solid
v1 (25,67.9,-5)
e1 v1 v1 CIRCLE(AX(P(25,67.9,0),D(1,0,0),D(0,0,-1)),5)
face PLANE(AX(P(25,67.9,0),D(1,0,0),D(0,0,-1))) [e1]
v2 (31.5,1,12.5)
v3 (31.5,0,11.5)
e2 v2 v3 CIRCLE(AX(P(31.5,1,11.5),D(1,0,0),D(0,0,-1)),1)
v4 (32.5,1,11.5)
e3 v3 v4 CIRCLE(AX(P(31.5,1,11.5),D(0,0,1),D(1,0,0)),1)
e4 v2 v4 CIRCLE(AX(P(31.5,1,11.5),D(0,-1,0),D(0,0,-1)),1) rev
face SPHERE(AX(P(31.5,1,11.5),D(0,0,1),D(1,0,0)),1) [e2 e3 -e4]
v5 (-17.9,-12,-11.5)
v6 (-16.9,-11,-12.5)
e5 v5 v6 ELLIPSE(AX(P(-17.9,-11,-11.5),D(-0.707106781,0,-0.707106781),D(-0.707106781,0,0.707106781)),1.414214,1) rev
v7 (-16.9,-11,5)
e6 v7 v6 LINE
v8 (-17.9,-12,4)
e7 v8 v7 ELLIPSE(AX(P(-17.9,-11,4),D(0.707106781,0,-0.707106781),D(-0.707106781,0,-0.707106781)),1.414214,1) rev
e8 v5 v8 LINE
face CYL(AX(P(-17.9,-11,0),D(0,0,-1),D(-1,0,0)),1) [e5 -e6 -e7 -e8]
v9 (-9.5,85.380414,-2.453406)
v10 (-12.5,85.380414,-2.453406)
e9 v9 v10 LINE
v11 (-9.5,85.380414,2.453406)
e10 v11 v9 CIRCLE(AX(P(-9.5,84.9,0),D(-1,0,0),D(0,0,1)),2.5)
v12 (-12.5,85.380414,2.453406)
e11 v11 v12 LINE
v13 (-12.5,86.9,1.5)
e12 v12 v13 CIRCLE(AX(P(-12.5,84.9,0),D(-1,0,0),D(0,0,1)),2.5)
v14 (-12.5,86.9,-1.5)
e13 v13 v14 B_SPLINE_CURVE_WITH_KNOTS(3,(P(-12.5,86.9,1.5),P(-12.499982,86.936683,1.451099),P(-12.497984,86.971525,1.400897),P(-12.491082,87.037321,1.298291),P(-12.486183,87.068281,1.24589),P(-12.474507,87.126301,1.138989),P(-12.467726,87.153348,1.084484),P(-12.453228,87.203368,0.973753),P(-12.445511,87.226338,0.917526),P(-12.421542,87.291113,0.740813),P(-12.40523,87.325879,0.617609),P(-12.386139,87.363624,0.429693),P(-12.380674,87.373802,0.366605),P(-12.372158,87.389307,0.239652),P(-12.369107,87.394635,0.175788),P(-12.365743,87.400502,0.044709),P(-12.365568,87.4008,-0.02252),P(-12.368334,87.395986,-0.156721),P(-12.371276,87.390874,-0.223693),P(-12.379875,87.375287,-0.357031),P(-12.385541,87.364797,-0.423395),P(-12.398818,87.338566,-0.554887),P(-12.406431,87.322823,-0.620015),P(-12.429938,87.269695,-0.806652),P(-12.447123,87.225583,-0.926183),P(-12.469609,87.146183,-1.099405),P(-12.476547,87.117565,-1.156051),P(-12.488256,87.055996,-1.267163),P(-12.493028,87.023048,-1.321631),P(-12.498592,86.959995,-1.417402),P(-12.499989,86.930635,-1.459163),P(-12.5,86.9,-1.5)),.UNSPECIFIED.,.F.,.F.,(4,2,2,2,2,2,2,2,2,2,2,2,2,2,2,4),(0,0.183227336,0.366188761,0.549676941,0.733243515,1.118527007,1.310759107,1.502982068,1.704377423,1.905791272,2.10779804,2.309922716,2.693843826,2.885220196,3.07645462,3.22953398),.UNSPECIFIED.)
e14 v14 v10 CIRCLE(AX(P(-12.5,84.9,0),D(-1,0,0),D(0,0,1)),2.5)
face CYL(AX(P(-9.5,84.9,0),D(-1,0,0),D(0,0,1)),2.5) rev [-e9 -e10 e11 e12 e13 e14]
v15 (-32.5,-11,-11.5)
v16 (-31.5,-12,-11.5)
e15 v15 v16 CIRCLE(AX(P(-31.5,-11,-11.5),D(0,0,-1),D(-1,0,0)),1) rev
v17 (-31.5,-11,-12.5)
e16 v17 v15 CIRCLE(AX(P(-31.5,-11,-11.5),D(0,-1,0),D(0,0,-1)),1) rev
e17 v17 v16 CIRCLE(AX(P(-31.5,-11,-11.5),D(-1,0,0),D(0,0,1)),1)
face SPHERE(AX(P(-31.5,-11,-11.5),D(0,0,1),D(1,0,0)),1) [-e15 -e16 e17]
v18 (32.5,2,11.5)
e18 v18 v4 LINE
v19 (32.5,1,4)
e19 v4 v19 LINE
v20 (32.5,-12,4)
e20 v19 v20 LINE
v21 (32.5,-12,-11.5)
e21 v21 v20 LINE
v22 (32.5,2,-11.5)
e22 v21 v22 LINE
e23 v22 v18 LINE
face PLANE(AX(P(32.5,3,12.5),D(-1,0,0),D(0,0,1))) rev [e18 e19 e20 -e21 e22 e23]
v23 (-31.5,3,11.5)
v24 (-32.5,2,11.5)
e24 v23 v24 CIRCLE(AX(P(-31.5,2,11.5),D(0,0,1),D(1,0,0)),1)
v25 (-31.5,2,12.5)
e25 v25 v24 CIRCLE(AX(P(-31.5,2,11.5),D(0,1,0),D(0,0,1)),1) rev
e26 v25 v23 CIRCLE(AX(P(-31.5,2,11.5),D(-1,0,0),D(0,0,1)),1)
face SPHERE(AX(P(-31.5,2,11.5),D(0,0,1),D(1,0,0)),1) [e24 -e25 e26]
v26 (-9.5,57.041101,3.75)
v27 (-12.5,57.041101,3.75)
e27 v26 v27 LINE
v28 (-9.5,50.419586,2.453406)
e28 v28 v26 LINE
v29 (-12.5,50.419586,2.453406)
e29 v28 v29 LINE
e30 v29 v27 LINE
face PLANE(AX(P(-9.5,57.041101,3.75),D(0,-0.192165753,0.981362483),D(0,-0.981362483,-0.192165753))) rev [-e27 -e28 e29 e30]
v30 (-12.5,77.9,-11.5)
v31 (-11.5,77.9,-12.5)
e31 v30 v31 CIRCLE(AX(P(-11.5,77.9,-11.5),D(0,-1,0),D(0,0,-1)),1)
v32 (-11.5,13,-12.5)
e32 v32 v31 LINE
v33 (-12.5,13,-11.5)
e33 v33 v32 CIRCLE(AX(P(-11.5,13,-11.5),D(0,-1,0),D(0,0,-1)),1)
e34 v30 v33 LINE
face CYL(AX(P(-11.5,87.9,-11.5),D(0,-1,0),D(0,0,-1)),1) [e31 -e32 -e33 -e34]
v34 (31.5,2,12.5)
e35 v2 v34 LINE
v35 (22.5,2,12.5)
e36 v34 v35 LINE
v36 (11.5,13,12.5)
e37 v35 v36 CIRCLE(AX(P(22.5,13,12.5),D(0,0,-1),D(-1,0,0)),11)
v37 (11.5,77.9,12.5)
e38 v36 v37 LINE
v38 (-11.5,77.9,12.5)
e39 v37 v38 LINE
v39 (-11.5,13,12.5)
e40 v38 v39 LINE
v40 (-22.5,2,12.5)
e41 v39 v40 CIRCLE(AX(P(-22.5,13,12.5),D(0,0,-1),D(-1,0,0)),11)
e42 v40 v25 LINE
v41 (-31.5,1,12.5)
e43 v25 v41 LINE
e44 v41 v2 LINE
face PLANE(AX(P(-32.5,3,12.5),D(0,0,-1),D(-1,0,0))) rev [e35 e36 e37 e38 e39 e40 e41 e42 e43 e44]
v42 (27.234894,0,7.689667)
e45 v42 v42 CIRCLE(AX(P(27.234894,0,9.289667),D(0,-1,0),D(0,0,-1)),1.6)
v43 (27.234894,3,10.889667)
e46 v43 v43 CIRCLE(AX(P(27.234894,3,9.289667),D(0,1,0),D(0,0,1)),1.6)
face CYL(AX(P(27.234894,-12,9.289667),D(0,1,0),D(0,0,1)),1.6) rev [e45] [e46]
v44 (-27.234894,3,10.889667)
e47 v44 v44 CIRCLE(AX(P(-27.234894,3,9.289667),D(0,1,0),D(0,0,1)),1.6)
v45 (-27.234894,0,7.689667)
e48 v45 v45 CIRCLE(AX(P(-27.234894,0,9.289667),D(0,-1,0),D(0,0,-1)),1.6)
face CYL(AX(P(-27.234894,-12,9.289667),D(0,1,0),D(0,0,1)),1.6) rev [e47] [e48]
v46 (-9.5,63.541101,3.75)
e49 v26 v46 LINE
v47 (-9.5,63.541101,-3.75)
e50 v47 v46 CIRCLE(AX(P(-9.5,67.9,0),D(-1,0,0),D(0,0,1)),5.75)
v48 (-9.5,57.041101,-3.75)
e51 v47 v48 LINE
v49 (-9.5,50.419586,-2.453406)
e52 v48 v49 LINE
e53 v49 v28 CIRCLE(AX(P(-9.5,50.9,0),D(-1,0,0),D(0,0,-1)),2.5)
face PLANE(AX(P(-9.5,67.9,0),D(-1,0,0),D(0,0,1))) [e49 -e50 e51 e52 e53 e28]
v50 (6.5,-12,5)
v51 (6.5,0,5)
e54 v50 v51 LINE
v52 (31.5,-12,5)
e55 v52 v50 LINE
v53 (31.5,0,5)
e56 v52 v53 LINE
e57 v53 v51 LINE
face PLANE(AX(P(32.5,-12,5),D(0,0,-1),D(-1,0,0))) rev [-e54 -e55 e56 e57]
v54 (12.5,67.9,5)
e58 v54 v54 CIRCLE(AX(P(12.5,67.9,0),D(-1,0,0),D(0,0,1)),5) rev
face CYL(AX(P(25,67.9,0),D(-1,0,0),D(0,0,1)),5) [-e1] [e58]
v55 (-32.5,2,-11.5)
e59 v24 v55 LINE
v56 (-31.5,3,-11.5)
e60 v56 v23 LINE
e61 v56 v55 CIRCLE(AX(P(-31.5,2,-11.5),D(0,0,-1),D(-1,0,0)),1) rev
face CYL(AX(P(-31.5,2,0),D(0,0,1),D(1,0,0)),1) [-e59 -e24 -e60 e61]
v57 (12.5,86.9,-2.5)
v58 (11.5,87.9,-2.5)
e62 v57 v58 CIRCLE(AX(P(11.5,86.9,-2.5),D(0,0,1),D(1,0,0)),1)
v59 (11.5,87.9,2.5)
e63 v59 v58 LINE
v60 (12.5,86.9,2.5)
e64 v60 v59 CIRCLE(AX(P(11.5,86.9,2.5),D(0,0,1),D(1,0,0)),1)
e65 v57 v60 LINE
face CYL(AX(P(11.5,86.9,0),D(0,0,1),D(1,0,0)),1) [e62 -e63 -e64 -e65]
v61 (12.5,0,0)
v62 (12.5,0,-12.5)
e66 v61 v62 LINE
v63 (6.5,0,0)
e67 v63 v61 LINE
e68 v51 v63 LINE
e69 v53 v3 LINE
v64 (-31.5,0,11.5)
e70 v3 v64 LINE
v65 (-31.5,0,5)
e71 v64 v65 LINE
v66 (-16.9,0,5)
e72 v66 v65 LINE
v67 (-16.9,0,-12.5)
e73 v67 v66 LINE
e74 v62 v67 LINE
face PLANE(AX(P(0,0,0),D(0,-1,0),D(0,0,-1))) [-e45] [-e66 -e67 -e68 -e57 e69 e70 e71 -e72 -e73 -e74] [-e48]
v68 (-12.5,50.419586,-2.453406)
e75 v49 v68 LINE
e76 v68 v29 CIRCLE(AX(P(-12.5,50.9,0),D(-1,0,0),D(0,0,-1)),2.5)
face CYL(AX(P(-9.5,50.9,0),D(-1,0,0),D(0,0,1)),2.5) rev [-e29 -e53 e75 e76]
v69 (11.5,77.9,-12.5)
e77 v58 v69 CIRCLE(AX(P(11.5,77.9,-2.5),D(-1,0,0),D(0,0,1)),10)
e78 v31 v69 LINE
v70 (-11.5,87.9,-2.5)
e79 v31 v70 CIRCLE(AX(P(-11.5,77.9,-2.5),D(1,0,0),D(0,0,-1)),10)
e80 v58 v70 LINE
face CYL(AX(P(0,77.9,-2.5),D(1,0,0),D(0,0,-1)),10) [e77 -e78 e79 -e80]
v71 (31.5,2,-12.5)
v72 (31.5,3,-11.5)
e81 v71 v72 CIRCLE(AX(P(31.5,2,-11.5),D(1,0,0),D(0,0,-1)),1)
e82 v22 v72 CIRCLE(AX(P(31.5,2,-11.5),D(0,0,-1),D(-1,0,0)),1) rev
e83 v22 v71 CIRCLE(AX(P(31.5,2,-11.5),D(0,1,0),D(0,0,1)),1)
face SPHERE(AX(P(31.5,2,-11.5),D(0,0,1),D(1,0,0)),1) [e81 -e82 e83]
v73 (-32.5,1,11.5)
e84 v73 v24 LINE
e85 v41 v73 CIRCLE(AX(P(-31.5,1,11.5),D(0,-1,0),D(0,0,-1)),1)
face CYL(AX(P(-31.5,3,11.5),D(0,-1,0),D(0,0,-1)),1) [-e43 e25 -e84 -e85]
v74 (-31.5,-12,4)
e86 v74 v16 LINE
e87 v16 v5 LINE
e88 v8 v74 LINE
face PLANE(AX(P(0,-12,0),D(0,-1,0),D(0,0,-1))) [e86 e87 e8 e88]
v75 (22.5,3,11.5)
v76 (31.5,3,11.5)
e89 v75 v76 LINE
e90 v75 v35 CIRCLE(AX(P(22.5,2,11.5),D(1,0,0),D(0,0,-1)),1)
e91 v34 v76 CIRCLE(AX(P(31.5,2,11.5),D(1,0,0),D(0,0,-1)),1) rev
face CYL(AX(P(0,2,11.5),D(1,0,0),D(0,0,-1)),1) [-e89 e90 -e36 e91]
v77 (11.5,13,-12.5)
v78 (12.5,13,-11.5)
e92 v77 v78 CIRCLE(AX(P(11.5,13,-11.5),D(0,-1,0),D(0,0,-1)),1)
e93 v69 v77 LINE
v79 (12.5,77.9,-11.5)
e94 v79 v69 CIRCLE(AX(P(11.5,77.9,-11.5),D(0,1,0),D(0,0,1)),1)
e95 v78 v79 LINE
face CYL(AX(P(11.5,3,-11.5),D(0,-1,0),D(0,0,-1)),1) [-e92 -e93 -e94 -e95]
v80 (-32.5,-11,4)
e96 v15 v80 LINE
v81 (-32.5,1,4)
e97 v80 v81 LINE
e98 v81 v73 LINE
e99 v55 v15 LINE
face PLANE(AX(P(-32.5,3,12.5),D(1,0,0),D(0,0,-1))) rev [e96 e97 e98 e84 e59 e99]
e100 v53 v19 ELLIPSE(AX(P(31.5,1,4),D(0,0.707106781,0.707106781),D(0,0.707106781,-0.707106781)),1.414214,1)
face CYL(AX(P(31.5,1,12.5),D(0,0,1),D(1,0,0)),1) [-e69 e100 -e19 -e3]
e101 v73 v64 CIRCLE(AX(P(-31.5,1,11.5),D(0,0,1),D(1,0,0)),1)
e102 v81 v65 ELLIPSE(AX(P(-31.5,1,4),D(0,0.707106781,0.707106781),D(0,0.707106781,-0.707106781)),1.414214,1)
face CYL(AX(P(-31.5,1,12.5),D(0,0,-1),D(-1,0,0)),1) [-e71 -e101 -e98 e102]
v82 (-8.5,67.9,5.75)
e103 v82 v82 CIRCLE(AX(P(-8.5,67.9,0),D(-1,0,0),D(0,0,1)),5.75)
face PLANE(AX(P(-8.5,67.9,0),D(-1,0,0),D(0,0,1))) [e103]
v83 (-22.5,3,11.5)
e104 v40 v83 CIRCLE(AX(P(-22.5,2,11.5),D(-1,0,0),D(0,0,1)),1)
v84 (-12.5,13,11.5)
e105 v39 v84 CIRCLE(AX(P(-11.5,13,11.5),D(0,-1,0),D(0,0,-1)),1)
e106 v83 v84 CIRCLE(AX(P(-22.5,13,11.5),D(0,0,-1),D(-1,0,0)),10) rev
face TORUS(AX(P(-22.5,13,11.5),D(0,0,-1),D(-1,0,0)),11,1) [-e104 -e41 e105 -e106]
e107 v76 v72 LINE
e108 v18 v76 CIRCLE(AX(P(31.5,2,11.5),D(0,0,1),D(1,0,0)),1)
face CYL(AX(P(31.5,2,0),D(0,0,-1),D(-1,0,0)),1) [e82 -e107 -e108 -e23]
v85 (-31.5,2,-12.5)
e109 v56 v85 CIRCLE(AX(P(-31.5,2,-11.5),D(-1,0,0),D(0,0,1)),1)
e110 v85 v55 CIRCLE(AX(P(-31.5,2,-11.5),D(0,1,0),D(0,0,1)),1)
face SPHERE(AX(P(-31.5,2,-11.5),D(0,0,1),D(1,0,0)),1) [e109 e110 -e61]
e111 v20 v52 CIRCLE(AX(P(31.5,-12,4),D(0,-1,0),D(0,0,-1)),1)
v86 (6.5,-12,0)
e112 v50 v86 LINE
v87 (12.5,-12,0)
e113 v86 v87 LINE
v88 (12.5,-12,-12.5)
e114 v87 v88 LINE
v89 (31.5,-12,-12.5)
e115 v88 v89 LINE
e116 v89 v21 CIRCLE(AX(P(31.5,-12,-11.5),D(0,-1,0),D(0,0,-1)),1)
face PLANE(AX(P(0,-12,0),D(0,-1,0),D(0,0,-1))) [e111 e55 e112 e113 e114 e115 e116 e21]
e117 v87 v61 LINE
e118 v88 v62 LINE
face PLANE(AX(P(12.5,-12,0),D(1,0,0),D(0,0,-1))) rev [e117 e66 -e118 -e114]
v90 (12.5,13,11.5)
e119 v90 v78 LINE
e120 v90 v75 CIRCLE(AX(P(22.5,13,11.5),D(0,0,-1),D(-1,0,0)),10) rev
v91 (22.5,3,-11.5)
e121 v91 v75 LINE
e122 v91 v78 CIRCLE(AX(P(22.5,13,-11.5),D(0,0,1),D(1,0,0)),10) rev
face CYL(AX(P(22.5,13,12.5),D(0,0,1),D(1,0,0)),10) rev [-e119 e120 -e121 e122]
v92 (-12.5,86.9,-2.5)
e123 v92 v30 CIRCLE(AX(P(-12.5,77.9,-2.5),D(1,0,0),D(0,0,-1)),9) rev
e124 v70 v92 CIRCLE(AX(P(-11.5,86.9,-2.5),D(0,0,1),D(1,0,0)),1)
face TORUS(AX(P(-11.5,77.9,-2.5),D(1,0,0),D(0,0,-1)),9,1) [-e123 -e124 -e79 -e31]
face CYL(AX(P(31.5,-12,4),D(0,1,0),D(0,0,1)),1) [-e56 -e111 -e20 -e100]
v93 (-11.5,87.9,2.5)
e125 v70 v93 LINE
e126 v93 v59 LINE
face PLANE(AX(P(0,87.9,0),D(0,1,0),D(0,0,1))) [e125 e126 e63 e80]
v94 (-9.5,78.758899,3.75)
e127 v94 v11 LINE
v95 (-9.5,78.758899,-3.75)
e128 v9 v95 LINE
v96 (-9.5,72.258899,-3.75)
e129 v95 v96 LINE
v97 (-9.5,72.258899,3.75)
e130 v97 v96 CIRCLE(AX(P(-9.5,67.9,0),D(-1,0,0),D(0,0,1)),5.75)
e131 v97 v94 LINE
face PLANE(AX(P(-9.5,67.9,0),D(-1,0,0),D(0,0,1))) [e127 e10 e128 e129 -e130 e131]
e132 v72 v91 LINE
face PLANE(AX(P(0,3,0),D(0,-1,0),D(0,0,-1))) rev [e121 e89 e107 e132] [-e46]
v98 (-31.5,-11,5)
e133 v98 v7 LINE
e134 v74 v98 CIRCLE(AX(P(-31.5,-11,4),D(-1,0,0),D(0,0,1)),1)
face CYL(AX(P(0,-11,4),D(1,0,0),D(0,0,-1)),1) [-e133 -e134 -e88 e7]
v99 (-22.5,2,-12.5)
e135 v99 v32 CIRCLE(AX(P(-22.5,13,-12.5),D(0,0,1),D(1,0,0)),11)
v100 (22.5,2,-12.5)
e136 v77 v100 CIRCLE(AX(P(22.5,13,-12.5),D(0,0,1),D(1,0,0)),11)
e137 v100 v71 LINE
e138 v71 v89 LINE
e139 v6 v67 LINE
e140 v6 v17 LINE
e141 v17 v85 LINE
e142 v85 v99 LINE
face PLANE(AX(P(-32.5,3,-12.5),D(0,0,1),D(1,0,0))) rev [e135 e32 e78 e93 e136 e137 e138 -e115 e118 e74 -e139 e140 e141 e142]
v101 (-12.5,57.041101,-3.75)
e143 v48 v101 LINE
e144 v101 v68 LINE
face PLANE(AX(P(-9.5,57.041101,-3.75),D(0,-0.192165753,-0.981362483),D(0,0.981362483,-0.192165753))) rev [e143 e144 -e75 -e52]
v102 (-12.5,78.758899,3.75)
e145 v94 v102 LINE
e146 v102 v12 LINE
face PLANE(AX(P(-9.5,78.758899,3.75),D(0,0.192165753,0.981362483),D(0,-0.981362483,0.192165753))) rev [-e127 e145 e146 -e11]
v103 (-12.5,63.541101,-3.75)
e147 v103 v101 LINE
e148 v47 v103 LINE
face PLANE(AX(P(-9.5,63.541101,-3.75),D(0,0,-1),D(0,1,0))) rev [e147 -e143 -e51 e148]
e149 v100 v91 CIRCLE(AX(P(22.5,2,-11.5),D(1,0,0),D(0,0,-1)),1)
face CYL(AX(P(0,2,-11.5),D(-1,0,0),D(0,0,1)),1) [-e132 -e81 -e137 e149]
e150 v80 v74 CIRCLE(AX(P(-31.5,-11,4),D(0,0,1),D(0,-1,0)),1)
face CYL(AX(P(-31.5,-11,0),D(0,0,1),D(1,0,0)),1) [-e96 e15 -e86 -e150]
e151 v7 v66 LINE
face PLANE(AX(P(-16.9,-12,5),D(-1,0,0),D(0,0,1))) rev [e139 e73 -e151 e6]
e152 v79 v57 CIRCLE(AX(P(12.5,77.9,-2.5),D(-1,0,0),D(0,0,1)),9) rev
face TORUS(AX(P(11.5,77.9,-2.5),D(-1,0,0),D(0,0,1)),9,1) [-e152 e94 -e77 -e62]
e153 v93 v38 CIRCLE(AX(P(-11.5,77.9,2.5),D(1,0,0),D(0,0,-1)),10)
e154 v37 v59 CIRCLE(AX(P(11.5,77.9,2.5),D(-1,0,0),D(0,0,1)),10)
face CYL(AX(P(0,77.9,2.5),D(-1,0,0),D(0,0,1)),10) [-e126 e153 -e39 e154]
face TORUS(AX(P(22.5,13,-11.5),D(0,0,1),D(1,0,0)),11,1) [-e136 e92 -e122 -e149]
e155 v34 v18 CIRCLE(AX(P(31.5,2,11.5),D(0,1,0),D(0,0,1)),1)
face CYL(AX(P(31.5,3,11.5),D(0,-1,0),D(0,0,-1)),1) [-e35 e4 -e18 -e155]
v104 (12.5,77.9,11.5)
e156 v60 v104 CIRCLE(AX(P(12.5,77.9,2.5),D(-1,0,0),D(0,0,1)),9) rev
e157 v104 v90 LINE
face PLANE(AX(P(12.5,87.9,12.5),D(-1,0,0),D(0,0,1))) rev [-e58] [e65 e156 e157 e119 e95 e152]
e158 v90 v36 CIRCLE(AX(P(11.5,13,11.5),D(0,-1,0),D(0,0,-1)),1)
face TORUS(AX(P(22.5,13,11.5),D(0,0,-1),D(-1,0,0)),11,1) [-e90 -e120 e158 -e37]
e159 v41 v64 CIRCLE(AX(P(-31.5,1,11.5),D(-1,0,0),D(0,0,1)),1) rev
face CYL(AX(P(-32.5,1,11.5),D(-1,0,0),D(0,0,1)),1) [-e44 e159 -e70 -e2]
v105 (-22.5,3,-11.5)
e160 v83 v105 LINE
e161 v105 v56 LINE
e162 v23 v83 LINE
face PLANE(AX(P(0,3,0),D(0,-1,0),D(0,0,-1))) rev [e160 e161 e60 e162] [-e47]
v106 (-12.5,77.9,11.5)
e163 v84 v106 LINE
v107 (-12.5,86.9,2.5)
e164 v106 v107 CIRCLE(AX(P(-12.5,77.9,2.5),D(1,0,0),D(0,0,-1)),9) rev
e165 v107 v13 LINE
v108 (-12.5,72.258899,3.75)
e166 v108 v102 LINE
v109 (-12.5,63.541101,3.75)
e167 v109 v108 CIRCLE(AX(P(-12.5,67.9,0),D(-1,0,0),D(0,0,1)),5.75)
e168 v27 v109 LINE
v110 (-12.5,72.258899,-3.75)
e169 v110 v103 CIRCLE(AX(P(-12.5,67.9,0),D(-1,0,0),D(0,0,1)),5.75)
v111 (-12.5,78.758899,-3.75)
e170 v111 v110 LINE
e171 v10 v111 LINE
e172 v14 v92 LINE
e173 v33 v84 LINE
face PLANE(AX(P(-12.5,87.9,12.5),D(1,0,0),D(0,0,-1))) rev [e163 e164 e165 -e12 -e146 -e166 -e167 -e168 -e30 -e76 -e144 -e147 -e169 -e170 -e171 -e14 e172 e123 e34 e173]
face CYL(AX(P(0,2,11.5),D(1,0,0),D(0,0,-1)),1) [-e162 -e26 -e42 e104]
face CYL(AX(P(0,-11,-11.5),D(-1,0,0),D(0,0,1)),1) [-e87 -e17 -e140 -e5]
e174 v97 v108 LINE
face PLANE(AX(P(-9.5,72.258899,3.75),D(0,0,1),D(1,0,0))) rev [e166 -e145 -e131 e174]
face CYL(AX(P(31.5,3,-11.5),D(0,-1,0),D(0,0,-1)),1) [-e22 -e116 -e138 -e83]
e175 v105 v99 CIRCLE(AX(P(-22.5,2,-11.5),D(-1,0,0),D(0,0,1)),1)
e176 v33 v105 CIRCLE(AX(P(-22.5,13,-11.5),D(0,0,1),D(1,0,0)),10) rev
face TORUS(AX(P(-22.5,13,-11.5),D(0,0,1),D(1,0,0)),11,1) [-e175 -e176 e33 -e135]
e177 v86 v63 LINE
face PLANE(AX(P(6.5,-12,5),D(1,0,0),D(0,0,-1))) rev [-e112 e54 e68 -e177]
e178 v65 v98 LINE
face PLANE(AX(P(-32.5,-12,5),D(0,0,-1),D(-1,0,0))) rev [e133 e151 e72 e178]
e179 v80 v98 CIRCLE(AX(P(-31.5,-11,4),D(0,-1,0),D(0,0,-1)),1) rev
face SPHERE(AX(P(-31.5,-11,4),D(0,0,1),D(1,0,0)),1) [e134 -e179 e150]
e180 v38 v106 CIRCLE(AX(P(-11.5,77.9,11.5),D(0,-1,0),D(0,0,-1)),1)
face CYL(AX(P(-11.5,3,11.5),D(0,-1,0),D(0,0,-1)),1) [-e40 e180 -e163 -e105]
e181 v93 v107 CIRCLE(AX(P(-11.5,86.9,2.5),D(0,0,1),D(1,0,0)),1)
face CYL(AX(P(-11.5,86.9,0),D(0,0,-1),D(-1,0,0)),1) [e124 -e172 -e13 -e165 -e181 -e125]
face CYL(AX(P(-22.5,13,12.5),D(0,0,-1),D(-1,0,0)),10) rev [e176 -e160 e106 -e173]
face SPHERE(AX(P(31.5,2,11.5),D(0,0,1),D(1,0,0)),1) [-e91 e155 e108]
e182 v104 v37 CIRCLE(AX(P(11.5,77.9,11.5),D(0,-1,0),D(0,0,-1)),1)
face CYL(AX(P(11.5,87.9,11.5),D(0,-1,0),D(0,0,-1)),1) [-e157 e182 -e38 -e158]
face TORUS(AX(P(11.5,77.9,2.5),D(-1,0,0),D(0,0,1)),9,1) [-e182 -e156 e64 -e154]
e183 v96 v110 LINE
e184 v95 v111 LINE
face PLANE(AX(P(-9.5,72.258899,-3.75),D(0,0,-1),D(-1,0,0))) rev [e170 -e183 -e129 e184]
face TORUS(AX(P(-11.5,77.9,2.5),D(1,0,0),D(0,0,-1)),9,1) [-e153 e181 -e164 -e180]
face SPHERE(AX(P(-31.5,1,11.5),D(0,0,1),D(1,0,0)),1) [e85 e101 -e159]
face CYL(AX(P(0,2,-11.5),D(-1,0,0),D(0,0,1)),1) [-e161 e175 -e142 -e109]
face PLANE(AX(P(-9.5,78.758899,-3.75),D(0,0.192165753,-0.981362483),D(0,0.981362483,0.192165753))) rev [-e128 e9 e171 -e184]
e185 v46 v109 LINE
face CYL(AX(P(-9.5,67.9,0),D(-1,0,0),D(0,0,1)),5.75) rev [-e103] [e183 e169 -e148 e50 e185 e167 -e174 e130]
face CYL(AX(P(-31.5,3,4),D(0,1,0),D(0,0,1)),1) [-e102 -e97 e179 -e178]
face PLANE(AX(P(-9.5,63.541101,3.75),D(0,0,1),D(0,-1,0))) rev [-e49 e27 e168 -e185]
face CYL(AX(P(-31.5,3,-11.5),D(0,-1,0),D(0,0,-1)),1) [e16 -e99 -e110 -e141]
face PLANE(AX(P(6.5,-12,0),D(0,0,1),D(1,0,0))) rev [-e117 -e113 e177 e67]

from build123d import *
from build123d.topology import SkipClean

# Parameters (mm, degrees)
SKETCH2_W           = 65
SKETCH2_H           = 25
BOSS_EXTRUDE1_DEPTH = 3
SKETCH3_W           = 15.6
SKETCH3_H           = 17.5
BOSS_EXTRUDE2_DEPTH = 12
SKETCH5_R           = 1.6
CUT_EXTRUDE1_DEPTH  = 38.91437722
SKETCH6_W           = 25
SKETCH6_H           = 25
BOSS_EXTRUDE3_DEPTH = 84.9
SKETCH9_R           = 5
BOSS_EXTRUDE4_DEPTH = 12.5
CUT_EXTRUDE2_DEPTH  = 3
SKETCH11_R          = 5.75
CUT_EXTRUDE3_DEPTH  = 1
FILLET1_R           = 10
FILLET2_R           = 1


with BuildPart() as part:
    # Sketch2 → Boss-Extrude1 (new body)
    with BuildSketch(Plane(origin=(0, 0, 0), x_dir=(1, 0, 0), z_dir=(0, 1, 0))):
        Rectangle(SKETCH2_W, SKETCH2_H)
    extrude(amount=BOSS_EXTRUDE1_DEPTH)

    # Sketch3 → Boss-Extrude2 (add)
    with BuildSketch(Plane.XZ):
        with Locations((-24.7, -3.75)):
            Rectangle(SKETCH3_W, SKETCH3_H)
        Polygon((32.5, 5), (6.5, 5), (6.5, 0), (12.5, 0), (12.5, -12.5), (32.5, -12.5), align=None)
    extrude(amount=BOSS_EXTRUDE2_DEPTH)

    # Sketch5 → Cut-Extrude1 (cut, through all)
    with BuildSketch(Plane(origin=(0, 3, 0), x_dir=(1, 0, 0), z_dir=(0, 1, 0))):
        with Locations(Location((27.234893969, -9.289666573, 0), (0, 0, 270))):
            Circle(SKETCH5_R)
        with Locations(Location((-27.234893969, -9.289666573, 0), (0, 0, 270))):
            Circle(SKETCH5_R)
    extrude(amount=-CUT_EXTRUDE1_DEPTH, mode=Mode.SUBTRACT)

    # Sketch6 → Boss-Extrude3 (add)
    with BuildSketch(Plane(origin=(0, 3, 0), x_dir=(1, 0, 0), z_dir=(0, 1, 0))):
        Rectangle(SKETCH6_W, SKETCH6_H)
    extrude(amount=BOSS_EXTRUDE3_DEPTH)

    # Sketch9 → Boss-Extrude4 (add)
    with BuildSketch(Plane(origin=(12.5, 0, 0), x_dir=(0, 0, -1), z_dir=(1, 0, 0))):
        with Locations(Location((0, 67.9, 0), (0, 0, 180))):
            Circle(SKETCH9_R)
    extrude(amount=BOSS_EXTRUDE4_DEPTH)

    # Sketch10 → Cut-Extrude2 (cut)
    with BuildSketch(Plane.ZY.offset(12.5)):
        with BuildLine():
            Line((-3.75, 72.258898944), (-3.75, 78.758898944))
            Line((-3.75, 78.758898944), (-2.453406208, 85.380414384))
            ThreePointArc((-2.453406208, 85.380414384), (0, 87.4), (2.453406208, 85.380414384))
            Line((2.453406208, 85.380414384), (3.75, 78.758898944))
            Line((3.75, 78.758898944), (3.75, 72.258898944))
            ThreePointArc((3.75, 72.258898944), (5.75, 67.9), (3.75, 63.541101056))
            Line((3.75, 63.541101056), (3.75, 57.041101056))
            Line((3.75, 57.041101056), (2.453406208, 50.419585616))
            ThreePointArc((2.453406208, 50.419585616), (0, 48.4), (-2.453406208, 50.419585616))
            Line((-2.453406208, 50.419585616), (-3.75, 57.041101056))
            Line((-3.75, 57.041101056), (-3.75, 63.541101056))
            ThreePointArc((-3.75, 63.541101056), (-5.75, 67.9), (-3.75, 72.258898944))
        make_face()
    extrude(amount=-CUT_EXTRUDE2_DEPTH, mode=Mode.SUBTRACT)

    # Sketch11 → Cut-Extrude3 (cut)
    with SkipClean():  # the faces are left unmerged after this step: merging them gives an invalid solid
        with BuildSketch(Plane.ZY.offset(9.5)):
            with Locations((0, 67.9)):
                Circle(SKETCH11_R)
        extrude(amount=-CUT_EXTRUDE3_DEPTH, mode=Mode.SUBTRACT)

    # Fillet1
    fillet1_edges = [part.edges().sort_by_distance(p)[0] for p in [
        (12.5, 3, 0),
        (-12.5, 3, 0),
        (0, 87.9, -12.5),
        (0, 87.9, 12.5),
    ]]
    fillet(fillet1_edges, radius=FILLET1_R)

    # Fillet2
    # the kernel refuses this fillet: 1 mm, written as the material it takes off along each edge
    with BuildSketch(Plane(origin=(31.5, 2, 11.5), x_dir=(0, 1, 0), z_dir=(0, 0, 1))) as fillet2_piece_1_section:
        Polygon((0, 0), (FILLET2_R, 0), (FILLET2_R, -FILLET2_R), (0, -FILLET2_R), align=None)
    fillet2_piece_1 = extrude(amount=FILLET2_R, mode=Mode.PRIVATE)
    fillet2_piece_1 = fillet2_piece_1 - Plane(origin=(31.5, 2, 11.5), x_dir=(-0.7071067811865475, -0.7071067811865475, 0), z_dir=(0, 0, 1)) * Sphere(FILLET2_R, mode=Mode.PRIVATE)
    add(fillet2_piece_1, mode=Mode.SUBTRACT)
    with BuildSketch(Plane(origin=(-31.5, 2, 11.5), x_dir=(0, 1, 0), z_dir=(0, 0, 1))) as fillet2_piece_2_section:
        Polygon((0, 0), (FILLET2_R, 0), (FILLET2_R, FILLET2_R), (0, FILLET2_R), align=None)
    fillet2_piece_2 = extrude(amount=FILLET2_R, mode=Mode.PRIVATE)
    fillet2_piece_2 = fillet2_piece_2 - Plane(origin=(-31.5, 2, 11.5), x_dir=(0.7071067811865475, -0.7071067811865475, 0), z_dir=(0, 0, 1)) * Sphere(FILLET2_R, mode=Mode.PRIVATE)
    add(fillet2_piece_2, mode=Mode.SUBTRACT)
    with BuildSketch(Plane(origin=(-31.5, 2, -11.5), x_dir=(0, 1, 0), z_dir=(-1, 0, 0))) as fillet2_piece_3_section:
        Polygon((0, 0), (FILLET2_R, 0), (FILLET2_R, FILLET2_R), (0, FILLET2_R), align=None)
    fillet2_piece_3 = extrude(amount=FILLET2_R, mode=Mode.PRIVATE)
    fillet2_piece_3 = fillet2_piece_3 - Plane(origin=(-31.5, 2, -11.5), x_dir=(0, -0.7071067811865475, 0.7071067811865475), z_dir=(-1, 0, 0)) * Sphere(FILLET2_R, mode=Mode.PRIVATE)
    add(fillet2_piece_3, mode=Mode.SUBTRACT)
    with BuildSketch(Plane(origin=(-31.5, -11, 4), x_dir=(0, 0, 1), z_dir=(-1, 0, 0))) as fillet2_piece_4_section:
        Polygon((0, 0), (FILLET2_R, 0), (FILLET2_R, -FILLET2_R), (0, -FILLET2_R), align=None)
    fillet2_piece_4 = extrude(amount=FILLET2_R, mode=Mode.PRIVATE)
    fillet2_piece_4 = fillet2_piece_4 - Plane(origin=(-31.5, -11, 4), x_dir=(0, 0.7071067811865475, -0.7071067811865475), z_dir=(-1, 0, 0)) * Sphere(FILLET2_R, mode=Mode.PRIVATE)
    add(fillet2_piece_4, mode=Mode.SUBTRACT)
    with BuildSketch(Plane(origin=(-31.5, -11, -11.5), x_dir=(0, 0, -1), z_dir=(-1, 0, 0))) as fillet2_piece_5_section:
        Polygon((0, 0), (FILLET2_R, 0), (FILLET2_R, FILLET2_R), (0, FILLET2_R), align=None)
    fillet2_piece_5 = extrude(amount=FILLET2_R, mode=Mode.PRIVATE)
    fillet2_piece_5 = fillet2_piece_5 - Plane(origin=(-31.5, -11, -11.5), x_dir=(0, 0.7071067811865475, 0.7071067811865475), z_dir=(-1, 0, 0)) * Sphere(FILLET2_R, mode=Mode.PRIVATE)
    add(fillet2_piece_5, mode=Mode.SUBTRACT)
    with BuildSketch(Plane(origin=(-31.5, 1, 11.5), x_dir=(-1, 0, 0), z_dir=(0, 0, 1))) as fillet2_piece_6_section:
        Polygon((0, 0), (FILLET2_R, 0), (FILLET2_R, FILLET2_R), (0, FILLET2_R), align=None)
    fillet2_piece_6 = extrude(amount=FILLET2_R, mode=Mode.PRIVATE)
    fillet2_piece_6 = fillet2_piece_6 - Plane(origin=(-31.5, 1, 11.5), x_dir=(0.7071067811865475, 0.7071067811865475, 0), z_dir=(0, 0, 1)) * Sphere(FILLET2_R, mode=Mode.PRIVATE)
    add(fillet2_piece_6, mode=Mode.SUBTRACT)
    with BuildSketch(Plane(origin=(31.5, 1, 11.5), x_dir=(0, -1, 0), z_dir=(0, 0, 1))) as fillet2_piece_7_section:
        Polygon((0, 0), (FILLET2_R, 0), (FILLET2_R, FILLET2_R), (0, FILLET2_R), align=None)
    fillet2_piece_7 = extrude(amount=FILLET2_R, mode=Mode.PRIVATE)
    fillet2_piece_7 = fillet2_piece_7 - Plane(origin=(31.5, 1, 11.5), x_dir=(-0.7071067811865475, 0.7071067811865475, 0), z_dir=(0, 0, 1)) * Sphere(FILLET2_R, mode=Mode.PRIVATE)
    add(fillet2_piece_7, mode=Mode.SUBTRACT)
    with BuildSketch(Plane(origin=(31.5, 2, -11.5), x_dir=(0, 0, -1), z_dir=(0, 1, 0))) as fillet2_piece_8_section:
        Polygon((0, 0), (FILLET2_R, 0), (FILLET2_R, -FILLET2_R), (0, -FILLET2_R), align=None)
    fillet2_piece_8 = extrude(amount=FILLET2_R, mode=Mode.PRIVATE)
    fillet2_piece_8 = fillet2_piece_8 - Plane(origin=(31.5, 2, -11.5), x_dir=(-0.7071067811865475, 0, 0.7071067811865475), z_dir=(0, 1, 0)) * Sphere(FILLET2_R, mode=Mode.PRIVATE)
    add(fillet2_piece_8, mode=Mode.SUBTRACT)
    with BuildSketch(Plane(origin=(22.5, 3, 12.5), x_dir=(0, -1, 0), z_dir=(1, 0, 0)), Plane(origin=(-31.5, 3, 12.5), x_dir=(0, -1, 0), z_dir=(1, 0, 0))) as fillet2_piece_9:
        with BuildLine():
            CenterArc((FILLET2_R, FILLET2_R), FILLET2_R, 180, 90)
            Line((0, FILLET2_R), (0, 0))
            Line((0, 0), (FILLET2_R, 0))
        make_face()
    extrude(amount=9, mode=Mode.SUBTRACT)
    with BuildSketch(Plane(origin=(22.5, 13, 12.5), x_dir=(-1, 0, 0), z_dir=(0, 1, 0))) as fillet2_piece_10:
        with BuildLine():
            CenterArc((10 + FILLET2_R, -FILLET2_R), FILLET2_R, 90, 90)
            Line((10, -FILLET2_R), (10, 0))
            Line((10, 0), (10 + FILLET2_R, 0))
        make_face()
    revolve(axis=Axis((22.5, 13, 12.5), (0, 0, 1)), revolution_arc=90, mode=Mode.SUBTRACT)
    with BuildSketch(Plane(origin=(12.5, 13, 12.5), x_dir=(-1, 0, 0), z_dir=(0, 1, 0)), Plane(origin=(12.5, 13, -12.5), x_dir=(0, 0, 1), z_dir=(0, 1, 0))) as fillet2_piece_11:
        with BuildLine():
            CenterArc((FILLET2_R, -FILLET2_R), FILLET2_R, 90, 90)
            Line((0, -FILLET2_R), (0, 0))
            Line((0, 0), (FILLET2_R, 0))
        make_face()
    extrude(amount=64.9, mode=Mode.SUBTRACT)
    with BuildSketch(Plane(origin=(12.5, 77.9, 2.5), x_dir=(0, 0, 1), z_dir=(0, -1, 0))) as fillet2_piece_12:
        with BuildLine():
            CenterArc((10 - FILLET2_R, FILLET2_R), FILLET2_R, 270, 90)
            Line((10 - FILLET2_R, 0), (10, 0))
            Line((10, 0), (10, FILLET2_R))
        make_face()
    revolve(axis=Axis((12.5, 77.9, 2.5), (-1, 0, 0)), revolution_arc=90, mode=Mode.SUBTRACT)
    with BuildSketch(Plane(origin=(12.5, 87.9, -2.5), x_dir=(0, -1, 0), z_dir=(0, 0, 1)), Plane(origin=(-12.5, 87.9, 2.5), x_dir=(0, -1, 0), z_dir=(0, 0, -1))) as fillet2_piece_13:
        with BuildLine():
            CenterArc((FILLET2_R, -FILLET2_R), FILLET2_R, 90, 90)
            Line((0, -FILLET2_R), (0, 0))
            Line((0, 0), (FILLET2_R, 0))
        make_face()
    extrude(amount=5, mode=Mode.SUBTRACT)
    with BuildSketch(Plane(origin=(12.5, 77.9, -2.5), x_dir=(0, 1, 0), z_dir=(0, 0, 1))) as fillet2_piece_14:
        with BuildLine():
            CenterArc((10 - FILLET2_R, FILLET2_R), FILLET2_R, 270, 90)
            Line((10, FILLET2_R), (10, 0))
            Line((10, 0), (10 - FILLET2_R, 0))
        make_face()
    revolve(axis=Axis((12.5, 77.9, -2.5), (-1, 0, 0)), revolution_arc=90, mode=Mode.SUBTRACT)
    with BuildSketch(Plane(origin=(22.5, 13, -12.5), x_dir=(-1, 0, 0), z_dir=(0, 1, 0))) as fillet2_piece_15:
        with BuildLine():
            CenterArc((10 + FILLET2_R, FILLET2_R), FILLET2_R, 180, 90)
            Line((10 + FILLET2_R, 0), (10, 0))
            Line((10, 0), (10, FILLET2_R))
        make_face()
    revolve(axis=Axis((22.5, 13, -12.5), (0, 0, 1)), revolution_arc=90, mode=Mode.SUBTRACT)
    with BuildSketch(Plane(origin=(-22.5, 13, 12.5), x_dir=(0, -1, 0), z_dir=(-1, 0, 0))) as fillet2_piece_16:
        with BuildLine():
            CenterArc((10 + FILLET2_R, -FILLET2_R), FILLET2_R, 90, 90)
            Line((10, -FILLET2_R), (10, 0))
            Line((10, 0), (10 + FILLET2_R, 0))
        make_face()
    revolve(axis=Axis((-22.5, 13, 12.5), (0, 0, 1)), revolution_arc=90, mode=Mode.SUBTRACT)
    with BuildSketch(Plane(origin=(-12.5, 13, 12.5), x_dir=(1, 0, 0), z_dir=(0, 1, 0)), Plane(origin=(-12.5, 13, -12.5), x_dir=(0, 0, 1), z_dir=(0, 1, 0))) as fillet2_piece_17:
        with BuildLine():
            CenterArc((FILLET2_R, FILLET2_R), FILLET2_R, 180, 90)
            Line((0, FILLET2_R), (0, 0))
            Line((0, 0), (FILLET2_R, 0))
        make_face()
    extrude(amount=64.9, mode=Mode.SUBTRACT)
    with BuildSketch(Plane(origin=(-12.5, 77.9, 2.5), x_dir=(0, 0, 1), z_dir=(0, -1, 0))) as fillet2_piece_18:
        with BuildLine():
            CenterArc((10 - FILLET2_R, -FILLET2_R), FILLET2_R, 0, 90)
            Line((10, -FILLET2_R), (10, 0))
            Line((10, 0), (10 - FILLET2_R, 0))
        make_face()
    revolve(axis=Axis((-12.5, 77.9, 2.5), (-1, 0, 0)), revolution_arc=90, mode=Mode.SUBTRACT)
    with BuildSketch(Plane(origin=(-12.5, 77.9, -2.5), x_dir=(0, 1, 0), z_dir=(0, 0, 1))) as fillet2_piece_19:
        with BuildLine():
            CenterArc((10 - FILLET2_R, -FILLET2_R), FILLET2_R, 0, 90)
            Line((10, -FILLET2_R), (10, 0))
            Line((10, 0), (10 - FILLET2_R, 0))
        make_face()
    revolve(axis=Axis((-12.5, 77.9, -2.5), (-1, 0, 0)), revolution_arc=90, mode=Mode.SUBTRACT)
    with BuildSketch(Plane(origin=(-22.5, 3, -12.5), x_dir=(0, 0, 1), z_dir=(-1, 0, 0)), Plane(origin=(31.5, 3, -12.5), x_dir=(0, 0, 1), z_dir=(-1, 0, 0))) as fillet2_piece_20:
        with BuildLine():
            CenterArc((FILLET2_R, -FILLET2_R), FILLET2_R, 90, 90)
            Line((0, -FILLET2_R), (0, 0))
            Line((0, 0), (FILLET2_R, 0))
        make_face()
    extrude(amount=9, mode=Mode.SUBTRACT)
    with BuildSketch(Plane(origin=(-22.5, 13, -12.5), x_dir=(0, -1, 0), z_dir=(-1, 0, 0))) as fillet2_piece_21:
        with BuildLine():
            CenterArc((10 + FILLET2_R, FILLET2_R), FILLET2_R, 180, 90)
            Line((10 + FILLET2_R, 0), (10, 0))
            Line((10, 0), (10, FILLET2_R))
        make_face()
    revolve(axis=Axis((-22.5, 13, -12.5), (0, 0, 1)), revolution_arc=90, mode=Mode.SUBTRACT)
    with BuildSketch(Plane(origin=(-31.5, -12, 5), x_dir=(0, 1, 0), z_dir=(1, 0, 0)), Plane(origin=(-14.4, -12, -12.5), x_dir=(0, 1, 0), z_dir=(-1, 0, 0))) as fillet2_piece_22:
        with BuildLine():
            CenterArc((FILLET2_R, -FILLET2_R), FILLET2_R, 90, 90)
            Line((0, -FILLET2_R), (0, 0))
            Line((0, 0), (FILLET2_R, 0))
        make_face()
    extrude(amount=17.1, mode=Mode.SUBTRACT)
    with BuildSketch(Plane(origin=(-16.9, -12, 7.5), x_dir=(-1, 0, 0), z_dir=(0, 0, -1))) as fillet2_piece_23:
        with BuildLine():
            CenterArc((FILLET2_R, FILLET2_R), FILLET2_R, 180, 90)
            Line((0, FILLET2_R), (0, 0))
            Line((0, 0), (FILLET2_R, 0))
        make_face()
    extrude(amount=22.5, mode=Mode.SUBTRACT)
    with BuildSketch(Plane(origin=(-32.5, -12, -11.5), x_dir=(0, 1, 0), z_dir=(0, 0, 1))) as fillet2_piece_24:
        with BuildLine():
            CenterArc((FILLET2_R, -FILLET2_R), FILLET2_R, 90, 90)
            Line((0, -FILLET2_R), (0, 0))
            Line((0, 0), (FILLET2_R, 0))
        make_face()
    extrude(amount=15.5, mode=Mode.SUBTRACT)
    with BuildSketch(Plane(origin=(-32.5, 1, 12.5), x_dir=(1, 0, 0), z_dir=(0, 1, 0))) as fillet2_piece_25:
        with BuildLine():
            CenterArc((FILLET2_R, FILLET2_R), FILLET2_R, 180, 90)
            Line((0, FILLET2_R), (0, 0))
            Line((0, 0), (FILLET2_R, 0))
        make_face()
    extrude(amount=1, mode=Mode.SUBTRACT)
    with BuildSketch(Plane(origin=(-32.5, 0, 5), x_dir=(0, 0, -1), z_dir=(0, -1, 0))) as fillet2_piece_26:
        with BuildLine():
            CenterArc((FILLET2_R, FILLET2_R), FILLET2_R, 180, 90)
            Line((0, FILLET2_R), (0, 0))
            Line((0, 0), (FILLET2_R, 0))
        make_face()
    extrude(amount=11, mode=Mode.SUBTRACT)
    with BuildSketch(Plane(origin=(-32.5, 0, 5), x_dir=(0, 1, 0), z_dir=(0, 0, 1))) as fillet2_piece_27:
        with BuildLine():
            CenterArc((FILLET2_R, -FILLET2_R), FILLET2_R, 90, 90)
            Line((0, -FILLET2_R), (0, 0))
            Line((0, 0), (FILLET2_R, 0))
        make_face()
    extrude(amount=6.5, mode=Mode.SUBTRACT)
    with BuildSketch(Plane(origin=(32.5, 1, 12.5), x_dir=(-1, 0, 0), z_dir=(0, 1, 0))) as fillet2_piece_28:
        with BuildLine():
            CenterArc((FILLET2_R, -FILLET2_R), FILLET2_R, 90, 90)
            Line((0, -FILLET2_R), (0, 0))
            Line((0, 0), (FILLET2_R, 0))
        make_face()
    extrude(amount=1, mode=Mode.SUBTRACT)
    with BuildSketch(Plane(origin=(32.5, 0, 5), x_dir=(0, 0, -1), z_dir=(0, -1, 0))) as fillet2_piece_29:
        with BuildLine():
            CenterArc((FILLET2_R, -FILLET2_R), FILLET2_R, 90, 90)
            Line((0, -FILLET2_R), (0, 0))
            Line((0, 0), (FILLET2_R, 0))
        make_face()
    extrude(amount=14.5, mode=Mode.SUBTRACT)
    with BuildSketch(Plane(origin=(32.5, 0, 11.5), x_dir=(-1, 0, 0), z_dir=(0, 0, -1))) as fillet2_piece_30:
        with BuildLine():
            CenterArc((FILLET2_R, FILLET2_R), FILLET2_R, 180, 90)
            Line((0, FILLET2_R), (0, 0))
            Line((0, 0), (FILLET2_R, 0))
        make_face()
    extrude(amount=6.5, mode=Mode.SUBTRACT)
    with BuildSketch(Plane(origin=(-31.5, 0, 12.5), x_dir=(0, 1, 0), z_dir=(1, 0, 0))) as fillet2_piece_31:
        with BuildLine():
            CenterArc((FILLET2_R, -FILLET2_R), FILLET2_R, 90, 90)
            Line((0, -FILLET2_R), (0, 0))
            Line((0, 0), (FILLET2_R, 0))
        make_face()
    extrude(amount=63, mode=Mode.SUBTRACT)
    with BuildSketch(Plane(origin=(-32.5, 2, -12.5), x_dir=(0, 0, 1), z_dir=(0, -1, 0))) as fillet2_piece_32:
        with BuildLine():
            CenterArc((FILLET2_R, -FILLET2_R), FILLET2_R, 90, 90)
            Line((0, -FILLET2_R), (0, 0))
            Line((0, 0), (FILLET2_R, 0))
        make_face()
    extrude(amount=13, mode=Mode.SUBTRACT)
    with BuildSketch(Plane(origin=(-32.5, 3, -11.5), x_dir=(1, 0, 0), z_dir=(0, 0, 1))) as fillet2_piece_33:
        with BuildLine():
            CenterArc((FILLET2_R, -FILLET2_R), FILLET2_R, 90, 90)
            Line((0, -FILLET2_R), (0, 0))
            Line((0, 0), (FILLET2_R, 0))
        make_face()
    extrude(amount=23, mode=Mode.SUBTRACT)
    with BuildSketch(Plane(origin=(32.5, 3, 11.5), x_dir=(0, -1, 0), z_dir=(0, 0, -1))) as fillet2_piece_34:
        with BuildLine():
            CenterArc((FILLET2_R, FILLET2_R), FILLET2_R, 180, 90)
            Line((0, FILLET2_R), (0, 0))
            Line((0, 0), (FILLET2_R, 0))
        make_face()
    extrude(amount=23, mode=Mode.SUBTRACT)
    with BuildSketch(Plane(origin=(32.5, -14.5, -12.5), x_dir=(0, 0, 1), z_dir=(0, 1, 0))) as fillet2_piece_35:
        with BuildLine():
            CenterArc((FILLET2_R, -FILLET2_R), FILLET2_R, 90, 90)
            Line((0, -FILLET2_R), (0, 0))
            Line((0, 0), (FILLET2_R, 0))
        make_face()
    extrude(amount=16.5, mode=Mode.SUBTRACT)
    with BuildSketch(Plane(origin=(-32.5, 0, 2.5), x_dir=(0, 1, 0), z_dir=(0, 0, 1))) as fillet2_piece_36a_section:
        with BuildLine():
            CenterArc((FILLET2_R, -FILLET2_R), FILLET2_R, 90, 90)
            Line((0, -FILLET2_R), (0, 0))
            Line((0, 0), (FILLET2_R, 0))
        make_face()
    fillet2_piece_36a = extrude(amount=9, mode=Mode.PRIVATE)
    fillet2_piece_36a = split(fillet2_piece_36a, bisect_by=Plane(origin=(-32.273604886, 0.226395114, 5), z_dir=(0, 0, -1)), keep=Keep.TOP, mode=Mode.PRIVATE)
    with BuildSketch(Plane(origin=(-32.5, 2.5, 5), x_dir=(0, 0, -1), z_dir=(0, -1, 0))) as fillet2_piece_36b_section:
        with BuildLine():
            CenterArc((FILLET2_R, FILLET2_R), FILLET2_R, 180, 90)
            Line((0, FILLET2_R), (0, 0))
            Line((0, 0), (FILLET2_R, 0))
        make_face()
    fillet2_piece_36b = extrude(amount=13.5, mode=Mode.PRIVATE)
    fillet2_piece_36b = split(fillet2_piece_36b, bisect_by=Plane(origin=(-32.273604886, 0, 4.773604886), z_dir=(0, 1, 0)), keep=Keep.TOP, mode=Mode.PRIVATE)
    fillet2_piece_36 = fillet2_piece_36a & fillet2_piece_36b
    add(fillet2_piece_36, mode=Mode.SUBTRACT)
    with BuildSketch(Plane(origin=(32.5, 0, 11.5), x_dir=(-1, 0, 0), z_dir=(0, 0, -1))) as fillet2_piece_37a_section:
        with BuildLine():
            CenterArc((FILLET2_R, FILLET2_R), FILLET2_R, 180, 90)
            Line((0, FILLET2_R), (0, 0))
            Line((0, 0), (FILLET2_R, 0))
        make_face()
    fillet2_piece_37a = extrude(amount=9, mode=Mode.PRIVATE)
    fillet2_piece_37a = split(fillet2_piece_37a, bisect_by=Plane(origin=(32.273604886, 0.226395114, 5), z_dir=(0, 0, -1)), keep=Keep.TOP, mode=Mode.PRIVATE)
    with BuildSketch(Plane(origin=(32.5, 2.5, 5), x_dir=(0, 0, -1), z_dir=(0, -1, 0))) as fillet2_piece_37b_section:
        with BuildLine():
            CenterArc((FILLET2_R, -FILLET2_R), FILLET2_R, 90, 90)
            Line((0, -FILLET2_R), (0, 0))
            Line((0, 0), (FILLET2_R, 0))
        make_face()
    fillet2_piece_37b = extrude(amount=17, mode=Mode.PRIVATE)
    fillet2_piece_37b = split(fillet2_piece_37b, bisect_by=Plane(origin=(32.273604886, 0, 4.773604886), z_dir=(0, 1, 0)), keep=Keep.TOP, mode=Mode.PRIVATE)
    fillet2_piece_37 = fillet2_piece_37a & fillet2_piece_37b
    add(fillet2_piece_37, mode=Mode.SUBTRACT)


solid = part.part
